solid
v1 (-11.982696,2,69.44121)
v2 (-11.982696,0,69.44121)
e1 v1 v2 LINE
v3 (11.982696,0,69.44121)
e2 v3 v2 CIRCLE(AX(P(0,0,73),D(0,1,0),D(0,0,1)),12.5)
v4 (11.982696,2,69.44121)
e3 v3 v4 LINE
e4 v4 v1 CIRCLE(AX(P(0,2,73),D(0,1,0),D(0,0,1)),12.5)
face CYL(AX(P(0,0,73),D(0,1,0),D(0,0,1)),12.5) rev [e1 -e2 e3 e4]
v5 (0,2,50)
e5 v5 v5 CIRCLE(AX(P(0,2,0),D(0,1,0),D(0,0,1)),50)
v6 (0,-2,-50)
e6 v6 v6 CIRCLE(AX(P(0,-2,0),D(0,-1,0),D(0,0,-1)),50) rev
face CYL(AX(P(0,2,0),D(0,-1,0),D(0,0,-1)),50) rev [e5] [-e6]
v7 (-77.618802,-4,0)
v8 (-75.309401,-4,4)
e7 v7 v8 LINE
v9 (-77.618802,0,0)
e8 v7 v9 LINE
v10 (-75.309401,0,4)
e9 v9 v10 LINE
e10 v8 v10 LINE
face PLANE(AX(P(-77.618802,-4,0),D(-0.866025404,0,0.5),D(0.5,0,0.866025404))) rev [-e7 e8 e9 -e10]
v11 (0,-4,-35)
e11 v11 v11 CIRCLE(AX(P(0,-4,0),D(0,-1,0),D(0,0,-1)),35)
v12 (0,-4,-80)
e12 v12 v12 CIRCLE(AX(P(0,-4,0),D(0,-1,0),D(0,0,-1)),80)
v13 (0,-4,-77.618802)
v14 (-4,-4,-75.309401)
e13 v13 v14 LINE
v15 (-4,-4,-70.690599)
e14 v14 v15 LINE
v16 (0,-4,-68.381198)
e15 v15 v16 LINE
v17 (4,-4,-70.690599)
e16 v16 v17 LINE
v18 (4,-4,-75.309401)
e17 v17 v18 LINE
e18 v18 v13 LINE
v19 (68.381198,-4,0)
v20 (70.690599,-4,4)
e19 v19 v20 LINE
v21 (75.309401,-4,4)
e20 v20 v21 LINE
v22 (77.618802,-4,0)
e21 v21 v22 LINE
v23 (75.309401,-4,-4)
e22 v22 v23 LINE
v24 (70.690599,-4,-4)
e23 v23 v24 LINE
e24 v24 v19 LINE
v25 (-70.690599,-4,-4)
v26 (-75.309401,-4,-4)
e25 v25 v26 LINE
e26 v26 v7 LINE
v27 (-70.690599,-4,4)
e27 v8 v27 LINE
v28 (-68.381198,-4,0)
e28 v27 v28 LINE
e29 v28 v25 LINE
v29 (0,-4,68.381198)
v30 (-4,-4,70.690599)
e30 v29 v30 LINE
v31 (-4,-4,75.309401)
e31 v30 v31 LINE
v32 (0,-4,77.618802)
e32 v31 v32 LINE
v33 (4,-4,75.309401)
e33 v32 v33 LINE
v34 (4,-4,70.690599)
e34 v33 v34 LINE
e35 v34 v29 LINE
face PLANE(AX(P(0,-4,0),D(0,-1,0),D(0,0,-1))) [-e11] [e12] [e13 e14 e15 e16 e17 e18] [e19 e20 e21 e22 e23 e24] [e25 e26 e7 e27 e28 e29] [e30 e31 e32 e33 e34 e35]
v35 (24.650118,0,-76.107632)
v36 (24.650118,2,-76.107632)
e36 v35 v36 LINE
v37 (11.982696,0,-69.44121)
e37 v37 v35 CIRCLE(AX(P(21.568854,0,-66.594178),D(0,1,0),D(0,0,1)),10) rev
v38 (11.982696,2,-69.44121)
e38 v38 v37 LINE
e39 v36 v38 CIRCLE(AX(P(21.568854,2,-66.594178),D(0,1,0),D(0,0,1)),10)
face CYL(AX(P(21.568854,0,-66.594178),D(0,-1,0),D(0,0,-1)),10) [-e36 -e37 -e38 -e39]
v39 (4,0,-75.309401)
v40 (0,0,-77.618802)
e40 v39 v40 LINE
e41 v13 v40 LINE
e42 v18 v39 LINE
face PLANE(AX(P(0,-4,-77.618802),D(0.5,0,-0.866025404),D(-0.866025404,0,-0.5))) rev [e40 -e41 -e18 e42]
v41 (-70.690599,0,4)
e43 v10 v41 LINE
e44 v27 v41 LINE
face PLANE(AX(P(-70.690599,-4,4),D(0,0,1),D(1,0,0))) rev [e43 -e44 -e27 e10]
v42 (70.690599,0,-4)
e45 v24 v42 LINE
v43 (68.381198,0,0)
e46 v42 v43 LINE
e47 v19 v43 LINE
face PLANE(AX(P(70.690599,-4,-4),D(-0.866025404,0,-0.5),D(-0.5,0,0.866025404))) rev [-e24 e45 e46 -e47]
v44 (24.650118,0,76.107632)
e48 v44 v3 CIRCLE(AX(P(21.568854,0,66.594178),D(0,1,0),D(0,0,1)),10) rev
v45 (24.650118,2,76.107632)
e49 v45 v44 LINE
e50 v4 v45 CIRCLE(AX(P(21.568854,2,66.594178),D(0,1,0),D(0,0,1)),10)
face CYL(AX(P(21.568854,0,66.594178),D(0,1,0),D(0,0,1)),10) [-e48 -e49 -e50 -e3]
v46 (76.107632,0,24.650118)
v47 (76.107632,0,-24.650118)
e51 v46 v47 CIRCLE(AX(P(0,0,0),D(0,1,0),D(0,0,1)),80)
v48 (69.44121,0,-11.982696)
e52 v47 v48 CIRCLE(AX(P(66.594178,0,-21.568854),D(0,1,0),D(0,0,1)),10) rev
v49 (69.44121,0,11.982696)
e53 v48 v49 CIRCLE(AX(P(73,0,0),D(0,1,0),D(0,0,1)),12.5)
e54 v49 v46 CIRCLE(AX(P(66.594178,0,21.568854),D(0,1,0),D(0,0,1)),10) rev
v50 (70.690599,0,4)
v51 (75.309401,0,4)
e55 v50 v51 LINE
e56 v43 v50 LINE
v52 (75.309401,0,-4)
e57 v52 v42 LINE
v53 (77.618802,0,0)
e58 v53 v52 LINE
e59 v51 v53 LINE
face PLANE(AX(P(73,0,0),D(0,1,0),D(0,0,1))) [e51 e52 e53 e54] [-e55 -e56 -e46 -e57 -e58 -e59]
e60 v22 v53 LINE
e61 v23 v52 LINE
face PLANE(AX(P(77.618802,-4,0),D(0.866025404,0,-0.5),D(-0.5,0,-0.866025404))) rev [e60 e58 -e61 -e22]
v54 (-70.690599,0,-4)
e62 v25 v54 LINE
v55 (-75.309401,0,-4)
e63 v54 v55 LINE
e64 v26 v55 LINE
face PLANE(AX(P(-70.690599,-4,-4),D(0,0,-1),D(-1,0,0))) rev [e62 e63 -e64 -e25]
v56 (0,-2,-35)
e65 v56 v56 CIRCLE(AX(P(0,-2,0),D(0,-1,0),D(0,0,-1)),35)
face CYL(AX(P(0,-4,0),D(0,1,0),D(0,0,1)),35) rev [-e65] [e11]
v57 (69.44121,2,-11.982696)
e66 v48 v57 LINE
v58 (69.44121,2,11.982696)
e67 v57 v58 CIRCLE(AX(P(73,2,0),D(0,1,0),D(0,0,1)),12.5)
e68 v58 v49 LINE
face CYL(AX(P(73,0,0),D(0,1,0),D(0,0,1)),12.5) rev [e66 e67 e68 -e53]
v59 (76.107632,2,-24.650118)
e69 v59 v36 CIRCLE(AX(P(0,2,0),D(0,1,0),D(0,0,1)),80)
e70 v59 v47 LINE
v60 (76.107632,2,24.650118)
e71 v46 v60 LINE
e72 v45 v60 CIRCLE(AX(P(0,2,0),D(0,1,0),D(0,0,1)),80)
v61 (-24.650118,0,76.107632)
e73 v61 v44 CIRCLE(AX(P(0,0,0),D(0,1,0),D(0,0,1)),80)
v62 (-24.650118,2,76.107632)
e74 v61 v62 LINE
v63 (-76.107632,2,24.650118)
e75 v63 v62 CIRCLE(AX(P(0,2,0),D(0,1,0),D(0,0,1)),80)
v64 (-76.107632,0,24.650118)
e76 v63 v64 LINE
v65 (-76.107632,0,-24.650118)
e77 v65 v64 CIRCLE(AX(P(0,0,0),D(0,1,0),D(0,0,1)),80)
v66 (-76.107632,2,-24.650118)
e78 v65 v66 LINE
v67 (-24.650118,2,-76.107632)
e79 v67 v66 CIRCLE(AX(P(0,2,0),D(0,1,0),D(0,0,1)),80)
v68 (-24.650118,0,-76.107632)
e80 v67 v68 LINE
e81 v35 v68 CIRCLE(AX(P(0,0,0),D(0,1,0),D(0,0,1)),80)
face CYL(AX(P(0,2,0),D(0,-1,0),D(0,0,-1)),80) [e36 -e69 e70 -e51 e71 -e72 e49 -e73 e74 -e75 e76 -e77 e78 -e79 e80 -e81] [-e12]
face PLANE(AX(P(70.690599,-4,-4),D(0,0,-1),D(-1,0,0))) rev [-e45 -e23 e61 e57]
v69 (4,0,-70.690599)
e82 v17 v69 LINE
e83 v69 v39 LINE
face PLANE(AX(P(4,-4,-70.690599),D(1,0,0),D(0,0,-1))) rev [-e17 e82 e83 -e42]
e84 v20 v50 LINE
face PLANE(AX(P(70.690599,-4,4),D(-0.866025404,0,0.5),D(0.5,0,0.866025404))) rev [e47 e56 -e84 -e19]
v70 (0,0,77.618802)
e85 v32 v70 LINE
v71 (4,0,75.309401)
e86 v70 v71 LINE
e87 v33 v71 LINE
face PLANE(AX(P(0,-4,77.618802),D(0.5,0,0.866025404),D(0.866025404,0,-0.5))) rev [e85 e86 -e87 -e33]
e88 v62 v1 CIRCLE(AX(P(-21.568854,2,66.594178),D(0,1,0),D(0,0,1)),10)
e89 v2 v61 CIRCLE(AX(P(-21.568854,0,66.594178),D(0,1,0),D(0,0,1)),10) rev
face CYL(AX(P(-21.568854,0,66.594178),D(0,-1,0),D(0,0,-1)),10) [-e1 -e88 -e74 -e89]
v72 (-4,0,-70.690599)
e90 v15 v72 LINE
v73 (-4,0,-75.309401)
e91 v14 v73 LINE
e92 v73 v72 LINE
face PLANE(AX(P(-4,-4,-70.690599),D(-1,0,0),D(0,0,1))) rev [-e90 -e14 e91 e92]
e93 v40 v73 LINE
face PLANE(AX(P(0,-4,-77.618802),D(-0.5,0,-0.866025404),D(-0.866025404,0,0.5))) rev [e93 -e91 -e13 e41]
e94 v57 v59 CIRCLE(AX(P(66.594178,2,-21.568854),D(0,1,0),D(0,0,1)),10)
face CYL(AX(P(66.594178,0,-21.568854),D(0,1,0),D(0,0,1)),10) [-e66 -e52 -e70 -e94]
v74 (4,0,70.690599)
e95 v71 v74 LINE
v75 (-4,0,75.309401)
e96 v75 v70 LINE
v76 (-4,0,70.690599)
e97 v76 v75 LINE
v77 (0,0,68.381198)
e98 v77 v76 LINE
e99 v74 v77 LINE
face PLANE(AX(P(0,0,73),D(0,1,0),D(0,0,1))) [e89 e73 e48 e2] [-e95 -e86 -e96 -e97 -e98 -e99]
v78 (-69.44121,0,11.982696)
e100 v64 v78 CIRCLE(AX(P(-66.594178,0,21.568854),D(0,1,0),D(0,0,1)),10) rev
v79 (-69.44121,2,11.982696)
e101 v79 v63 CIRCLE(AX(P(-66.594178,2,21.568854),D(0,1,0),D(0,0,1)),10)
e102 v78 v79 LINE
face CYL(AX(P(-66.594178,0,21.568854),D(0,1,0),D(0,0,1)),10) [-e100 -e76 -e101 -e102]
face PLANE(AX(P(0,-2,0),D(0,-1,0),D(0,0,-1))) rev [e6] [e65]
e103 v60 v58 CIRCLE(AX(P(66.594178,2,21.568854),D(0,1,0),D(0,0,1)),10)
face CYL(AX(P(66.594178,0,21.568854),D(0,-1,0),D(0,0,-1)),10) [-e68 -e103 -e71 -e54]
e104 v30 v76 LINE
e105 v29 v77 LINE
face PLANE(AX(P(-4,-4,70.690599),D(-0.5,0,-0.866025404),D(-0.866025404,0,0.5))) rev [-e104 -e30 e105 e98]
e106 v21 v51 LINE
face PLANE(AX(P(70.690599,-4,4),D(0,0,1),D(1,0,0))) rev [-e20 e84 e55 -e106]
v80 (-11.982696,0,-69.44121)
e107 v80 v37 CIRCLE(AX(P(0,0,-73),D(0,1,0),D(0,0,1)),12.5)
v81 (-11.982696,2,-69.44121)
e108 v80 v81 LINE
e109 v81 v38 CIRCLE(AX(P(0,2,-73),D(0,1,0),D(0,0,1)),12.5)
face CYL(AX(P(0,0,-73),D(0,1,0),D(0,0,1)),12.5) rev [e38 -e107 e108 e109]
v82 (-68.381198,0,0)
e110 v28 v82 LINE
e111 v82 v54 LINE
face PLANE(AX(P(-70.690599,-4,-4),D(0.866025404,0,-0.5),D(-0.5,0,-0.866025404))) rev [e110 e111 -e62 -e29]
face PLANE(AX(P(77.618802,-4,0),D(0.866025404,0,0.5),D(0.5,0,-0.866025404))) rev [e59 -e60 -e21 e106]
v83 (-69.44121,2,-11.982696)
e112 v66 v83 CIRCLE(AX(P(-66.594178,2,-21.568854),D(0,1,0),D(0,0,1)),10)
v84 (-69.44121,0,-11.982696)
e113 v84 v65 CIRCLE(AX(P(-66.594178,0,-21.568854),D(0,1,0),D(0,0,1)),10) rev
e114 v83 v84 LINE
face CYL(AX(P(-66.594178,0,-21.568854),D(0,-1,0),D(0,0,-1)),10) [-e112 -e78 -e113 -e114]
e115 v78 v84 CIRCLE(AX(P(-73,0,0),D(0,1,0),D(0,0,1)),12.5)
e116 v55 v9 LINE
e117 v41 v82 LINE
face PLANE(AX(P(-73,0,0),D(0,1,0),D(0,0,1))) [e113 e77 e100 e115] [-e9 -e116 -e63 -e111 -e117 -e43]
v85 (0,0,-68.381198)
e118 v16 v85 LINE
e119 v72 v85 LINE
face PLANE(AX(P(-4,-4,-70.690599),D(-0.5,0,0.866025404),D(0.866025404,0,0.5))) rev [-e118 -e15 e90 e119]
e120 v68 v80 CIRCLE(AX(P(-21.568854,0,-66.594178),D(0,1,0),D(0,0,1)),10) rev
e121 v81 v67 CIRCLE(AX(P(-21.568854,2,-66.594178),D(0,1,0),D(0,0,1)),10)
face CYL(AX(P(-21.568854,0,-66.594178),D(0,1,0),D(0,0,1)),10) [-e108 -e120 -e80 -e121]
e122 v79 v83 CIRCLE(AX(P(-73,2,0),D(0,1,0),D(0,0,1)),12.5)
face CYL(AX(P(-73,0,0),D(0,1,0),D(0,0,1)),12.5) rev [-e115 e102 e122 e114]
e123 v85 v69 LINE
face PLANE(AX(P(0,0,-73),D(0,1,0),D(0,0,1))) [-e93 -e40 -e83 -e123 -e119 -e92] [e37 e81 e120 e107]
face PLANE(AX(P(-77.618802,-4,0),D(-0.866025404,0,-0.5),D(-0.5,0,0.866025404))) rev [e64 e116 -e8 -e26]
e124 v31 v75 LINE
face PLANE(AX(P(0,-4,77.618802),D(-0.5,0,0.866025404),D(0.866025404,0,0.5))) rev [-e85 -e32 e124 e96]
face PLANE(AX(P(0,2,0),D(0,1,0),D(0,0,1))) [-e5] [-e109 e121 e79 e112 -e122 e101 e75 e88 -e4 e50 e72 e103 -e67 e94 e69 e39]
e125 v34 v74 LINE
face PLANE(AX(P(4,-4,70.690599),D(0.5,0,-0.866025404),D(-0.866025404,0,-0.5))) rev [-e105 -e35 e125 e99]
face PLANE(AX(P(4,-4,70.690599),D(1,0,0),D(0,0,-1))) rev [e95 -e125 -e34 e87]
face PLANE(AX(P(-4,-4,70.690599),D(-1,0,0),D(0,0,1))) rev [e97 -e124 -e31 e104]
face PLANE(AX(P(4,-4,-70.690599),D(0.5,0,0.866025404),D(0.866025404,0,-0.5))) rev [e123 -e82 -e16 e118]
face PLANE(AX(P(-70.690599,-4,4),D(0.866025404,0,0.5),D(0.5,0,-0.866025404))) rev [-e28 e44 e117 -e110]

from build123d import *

# Parameters (mm, degrees)
SKETCH1_R           = 80
SKETCH1_R_2         = 50
BOSS_EXTRUDE1_DEPTH = 2
BOSS_EXTRUDE2_START = 4
SKETCH2_R           = 80
SKETCH2_R_2         = 35
BOSS_EXTRUDE2_DEPTH = 4
SKETCH3_R           = 12.5
CUT_EXTRUDE1_DEPTH  = 2
FILLET1_R           = 10
CUT_EXTRUDE2_DEPTH  = 114.20777373
MOVE_FACE1_BY       = 2


with BuildPart() as part:
    # Sketch1 → Boss-Extrude1 (new body)
    with BuildSketch(Plane(origin=(0, 0, 0), x_dir=(1, 0, 0), z_dir=(0, 1, 0))):
        Circle(SKETCH1_R)
        Circle(SKETCH1_R_2, mode=Mode.SUBTRACT)
    extrude(amount=BOSS_EXTRUDE1_DEPTH)

    # Sketch2 → Boss-Extrude2 (add)
    with BuildSketch(Plane.XZ.offset(BOSS_EXTRUDE2_START)):
        Circle(SKETCH2_R)
        Circle(SKETCH2_R_2, mode=Mode.SUBTRACT)
    extrude(amount=-BOSS_EXTRUDE2_DEPTH)

    # Sketch3 → Cut-Extrude1 (cut)
    with BuildSketch(Plane(origin=(0, 2, 0), x_dir=(1, 0, 0), z_dir=(0, 1, 0))):
        with Locations((0, 73)):
            Circle(SKETCH3_R)
        with Locations((73, 0)):
            Circle(SKETCH3_R)
        with Locations((0, -73)):
            Circle(SKETCH3_R)
        with Locations((-73, 0)):
            Circle(SKETCH3_R)
    extrude(amount=-CUT_EXTRUDE1_DEPTH, mode=Mode.SUBTRACT)

    # Fillet1
    fillet1_edges = [part.edges().sort_by_distance(p)[0] for p in [
        (79.265410959, 1, 10.816405388),
        (79.265410959, 1, -10.816405388),
        (10.816405388, 1, 79.265410959),
        (-10.816405388, 1, 79.265410959),
        (-79.265410959, 1, -10.816405388),
        (-79.265410959, 1, 10.816405388),
        (10.816405388, 1, -79.265410959),
        (-10.816405388, 1, -79.265410959),
    ]]
    fillet(fillet1_edges, radius=FILLET1_R)

    # Sketch4 → Cut-Extrude2 (cut, through all)
    with BuildSketch(Plane(origin=(0, 0, 0), x_dir=(1, 0, 0), z_dir=(0, 1, 0))):
        Polygon((-4, 70.690598923), (-4, 75.309401077), (0, 77.618802154), (4, 75.309401077), (4, 70.690598923), (0, 68.381197846), align=None)
        Polygon((70.690598923, -4), (68.381197846, 0), (70.690598923, 4), (75.309401077, 4), (77.618802154, 0), (75.309401077, -4), align=None)
        Polygon((-4, -70.690598923), (0, -68.381197846), (4, -70.690598923), (4, -75.309401077), (0, -77.618802154), (-4, -75.309401077), align=None)
        Polygon((-70.690598923, 4), (-68.381197846, 0), (-70.690598923, -4), (-75.309401077, -4), (-77.618802154, 0), (-75.309401077, 4), align=None)
    extrude(amount=-CUT_EXTRUDE2_DEPTH, mode=Mode.SUBTRACT)

    # Move Face1: a face moved inward by 2.0
    extrude(part.faces().sort_by_distance((0, 0, -40))[0], amount=MOVE_FACE1_BY, dir=(0, -1, 0), mode=Mode.SUBTRACT)


solid = part.part
